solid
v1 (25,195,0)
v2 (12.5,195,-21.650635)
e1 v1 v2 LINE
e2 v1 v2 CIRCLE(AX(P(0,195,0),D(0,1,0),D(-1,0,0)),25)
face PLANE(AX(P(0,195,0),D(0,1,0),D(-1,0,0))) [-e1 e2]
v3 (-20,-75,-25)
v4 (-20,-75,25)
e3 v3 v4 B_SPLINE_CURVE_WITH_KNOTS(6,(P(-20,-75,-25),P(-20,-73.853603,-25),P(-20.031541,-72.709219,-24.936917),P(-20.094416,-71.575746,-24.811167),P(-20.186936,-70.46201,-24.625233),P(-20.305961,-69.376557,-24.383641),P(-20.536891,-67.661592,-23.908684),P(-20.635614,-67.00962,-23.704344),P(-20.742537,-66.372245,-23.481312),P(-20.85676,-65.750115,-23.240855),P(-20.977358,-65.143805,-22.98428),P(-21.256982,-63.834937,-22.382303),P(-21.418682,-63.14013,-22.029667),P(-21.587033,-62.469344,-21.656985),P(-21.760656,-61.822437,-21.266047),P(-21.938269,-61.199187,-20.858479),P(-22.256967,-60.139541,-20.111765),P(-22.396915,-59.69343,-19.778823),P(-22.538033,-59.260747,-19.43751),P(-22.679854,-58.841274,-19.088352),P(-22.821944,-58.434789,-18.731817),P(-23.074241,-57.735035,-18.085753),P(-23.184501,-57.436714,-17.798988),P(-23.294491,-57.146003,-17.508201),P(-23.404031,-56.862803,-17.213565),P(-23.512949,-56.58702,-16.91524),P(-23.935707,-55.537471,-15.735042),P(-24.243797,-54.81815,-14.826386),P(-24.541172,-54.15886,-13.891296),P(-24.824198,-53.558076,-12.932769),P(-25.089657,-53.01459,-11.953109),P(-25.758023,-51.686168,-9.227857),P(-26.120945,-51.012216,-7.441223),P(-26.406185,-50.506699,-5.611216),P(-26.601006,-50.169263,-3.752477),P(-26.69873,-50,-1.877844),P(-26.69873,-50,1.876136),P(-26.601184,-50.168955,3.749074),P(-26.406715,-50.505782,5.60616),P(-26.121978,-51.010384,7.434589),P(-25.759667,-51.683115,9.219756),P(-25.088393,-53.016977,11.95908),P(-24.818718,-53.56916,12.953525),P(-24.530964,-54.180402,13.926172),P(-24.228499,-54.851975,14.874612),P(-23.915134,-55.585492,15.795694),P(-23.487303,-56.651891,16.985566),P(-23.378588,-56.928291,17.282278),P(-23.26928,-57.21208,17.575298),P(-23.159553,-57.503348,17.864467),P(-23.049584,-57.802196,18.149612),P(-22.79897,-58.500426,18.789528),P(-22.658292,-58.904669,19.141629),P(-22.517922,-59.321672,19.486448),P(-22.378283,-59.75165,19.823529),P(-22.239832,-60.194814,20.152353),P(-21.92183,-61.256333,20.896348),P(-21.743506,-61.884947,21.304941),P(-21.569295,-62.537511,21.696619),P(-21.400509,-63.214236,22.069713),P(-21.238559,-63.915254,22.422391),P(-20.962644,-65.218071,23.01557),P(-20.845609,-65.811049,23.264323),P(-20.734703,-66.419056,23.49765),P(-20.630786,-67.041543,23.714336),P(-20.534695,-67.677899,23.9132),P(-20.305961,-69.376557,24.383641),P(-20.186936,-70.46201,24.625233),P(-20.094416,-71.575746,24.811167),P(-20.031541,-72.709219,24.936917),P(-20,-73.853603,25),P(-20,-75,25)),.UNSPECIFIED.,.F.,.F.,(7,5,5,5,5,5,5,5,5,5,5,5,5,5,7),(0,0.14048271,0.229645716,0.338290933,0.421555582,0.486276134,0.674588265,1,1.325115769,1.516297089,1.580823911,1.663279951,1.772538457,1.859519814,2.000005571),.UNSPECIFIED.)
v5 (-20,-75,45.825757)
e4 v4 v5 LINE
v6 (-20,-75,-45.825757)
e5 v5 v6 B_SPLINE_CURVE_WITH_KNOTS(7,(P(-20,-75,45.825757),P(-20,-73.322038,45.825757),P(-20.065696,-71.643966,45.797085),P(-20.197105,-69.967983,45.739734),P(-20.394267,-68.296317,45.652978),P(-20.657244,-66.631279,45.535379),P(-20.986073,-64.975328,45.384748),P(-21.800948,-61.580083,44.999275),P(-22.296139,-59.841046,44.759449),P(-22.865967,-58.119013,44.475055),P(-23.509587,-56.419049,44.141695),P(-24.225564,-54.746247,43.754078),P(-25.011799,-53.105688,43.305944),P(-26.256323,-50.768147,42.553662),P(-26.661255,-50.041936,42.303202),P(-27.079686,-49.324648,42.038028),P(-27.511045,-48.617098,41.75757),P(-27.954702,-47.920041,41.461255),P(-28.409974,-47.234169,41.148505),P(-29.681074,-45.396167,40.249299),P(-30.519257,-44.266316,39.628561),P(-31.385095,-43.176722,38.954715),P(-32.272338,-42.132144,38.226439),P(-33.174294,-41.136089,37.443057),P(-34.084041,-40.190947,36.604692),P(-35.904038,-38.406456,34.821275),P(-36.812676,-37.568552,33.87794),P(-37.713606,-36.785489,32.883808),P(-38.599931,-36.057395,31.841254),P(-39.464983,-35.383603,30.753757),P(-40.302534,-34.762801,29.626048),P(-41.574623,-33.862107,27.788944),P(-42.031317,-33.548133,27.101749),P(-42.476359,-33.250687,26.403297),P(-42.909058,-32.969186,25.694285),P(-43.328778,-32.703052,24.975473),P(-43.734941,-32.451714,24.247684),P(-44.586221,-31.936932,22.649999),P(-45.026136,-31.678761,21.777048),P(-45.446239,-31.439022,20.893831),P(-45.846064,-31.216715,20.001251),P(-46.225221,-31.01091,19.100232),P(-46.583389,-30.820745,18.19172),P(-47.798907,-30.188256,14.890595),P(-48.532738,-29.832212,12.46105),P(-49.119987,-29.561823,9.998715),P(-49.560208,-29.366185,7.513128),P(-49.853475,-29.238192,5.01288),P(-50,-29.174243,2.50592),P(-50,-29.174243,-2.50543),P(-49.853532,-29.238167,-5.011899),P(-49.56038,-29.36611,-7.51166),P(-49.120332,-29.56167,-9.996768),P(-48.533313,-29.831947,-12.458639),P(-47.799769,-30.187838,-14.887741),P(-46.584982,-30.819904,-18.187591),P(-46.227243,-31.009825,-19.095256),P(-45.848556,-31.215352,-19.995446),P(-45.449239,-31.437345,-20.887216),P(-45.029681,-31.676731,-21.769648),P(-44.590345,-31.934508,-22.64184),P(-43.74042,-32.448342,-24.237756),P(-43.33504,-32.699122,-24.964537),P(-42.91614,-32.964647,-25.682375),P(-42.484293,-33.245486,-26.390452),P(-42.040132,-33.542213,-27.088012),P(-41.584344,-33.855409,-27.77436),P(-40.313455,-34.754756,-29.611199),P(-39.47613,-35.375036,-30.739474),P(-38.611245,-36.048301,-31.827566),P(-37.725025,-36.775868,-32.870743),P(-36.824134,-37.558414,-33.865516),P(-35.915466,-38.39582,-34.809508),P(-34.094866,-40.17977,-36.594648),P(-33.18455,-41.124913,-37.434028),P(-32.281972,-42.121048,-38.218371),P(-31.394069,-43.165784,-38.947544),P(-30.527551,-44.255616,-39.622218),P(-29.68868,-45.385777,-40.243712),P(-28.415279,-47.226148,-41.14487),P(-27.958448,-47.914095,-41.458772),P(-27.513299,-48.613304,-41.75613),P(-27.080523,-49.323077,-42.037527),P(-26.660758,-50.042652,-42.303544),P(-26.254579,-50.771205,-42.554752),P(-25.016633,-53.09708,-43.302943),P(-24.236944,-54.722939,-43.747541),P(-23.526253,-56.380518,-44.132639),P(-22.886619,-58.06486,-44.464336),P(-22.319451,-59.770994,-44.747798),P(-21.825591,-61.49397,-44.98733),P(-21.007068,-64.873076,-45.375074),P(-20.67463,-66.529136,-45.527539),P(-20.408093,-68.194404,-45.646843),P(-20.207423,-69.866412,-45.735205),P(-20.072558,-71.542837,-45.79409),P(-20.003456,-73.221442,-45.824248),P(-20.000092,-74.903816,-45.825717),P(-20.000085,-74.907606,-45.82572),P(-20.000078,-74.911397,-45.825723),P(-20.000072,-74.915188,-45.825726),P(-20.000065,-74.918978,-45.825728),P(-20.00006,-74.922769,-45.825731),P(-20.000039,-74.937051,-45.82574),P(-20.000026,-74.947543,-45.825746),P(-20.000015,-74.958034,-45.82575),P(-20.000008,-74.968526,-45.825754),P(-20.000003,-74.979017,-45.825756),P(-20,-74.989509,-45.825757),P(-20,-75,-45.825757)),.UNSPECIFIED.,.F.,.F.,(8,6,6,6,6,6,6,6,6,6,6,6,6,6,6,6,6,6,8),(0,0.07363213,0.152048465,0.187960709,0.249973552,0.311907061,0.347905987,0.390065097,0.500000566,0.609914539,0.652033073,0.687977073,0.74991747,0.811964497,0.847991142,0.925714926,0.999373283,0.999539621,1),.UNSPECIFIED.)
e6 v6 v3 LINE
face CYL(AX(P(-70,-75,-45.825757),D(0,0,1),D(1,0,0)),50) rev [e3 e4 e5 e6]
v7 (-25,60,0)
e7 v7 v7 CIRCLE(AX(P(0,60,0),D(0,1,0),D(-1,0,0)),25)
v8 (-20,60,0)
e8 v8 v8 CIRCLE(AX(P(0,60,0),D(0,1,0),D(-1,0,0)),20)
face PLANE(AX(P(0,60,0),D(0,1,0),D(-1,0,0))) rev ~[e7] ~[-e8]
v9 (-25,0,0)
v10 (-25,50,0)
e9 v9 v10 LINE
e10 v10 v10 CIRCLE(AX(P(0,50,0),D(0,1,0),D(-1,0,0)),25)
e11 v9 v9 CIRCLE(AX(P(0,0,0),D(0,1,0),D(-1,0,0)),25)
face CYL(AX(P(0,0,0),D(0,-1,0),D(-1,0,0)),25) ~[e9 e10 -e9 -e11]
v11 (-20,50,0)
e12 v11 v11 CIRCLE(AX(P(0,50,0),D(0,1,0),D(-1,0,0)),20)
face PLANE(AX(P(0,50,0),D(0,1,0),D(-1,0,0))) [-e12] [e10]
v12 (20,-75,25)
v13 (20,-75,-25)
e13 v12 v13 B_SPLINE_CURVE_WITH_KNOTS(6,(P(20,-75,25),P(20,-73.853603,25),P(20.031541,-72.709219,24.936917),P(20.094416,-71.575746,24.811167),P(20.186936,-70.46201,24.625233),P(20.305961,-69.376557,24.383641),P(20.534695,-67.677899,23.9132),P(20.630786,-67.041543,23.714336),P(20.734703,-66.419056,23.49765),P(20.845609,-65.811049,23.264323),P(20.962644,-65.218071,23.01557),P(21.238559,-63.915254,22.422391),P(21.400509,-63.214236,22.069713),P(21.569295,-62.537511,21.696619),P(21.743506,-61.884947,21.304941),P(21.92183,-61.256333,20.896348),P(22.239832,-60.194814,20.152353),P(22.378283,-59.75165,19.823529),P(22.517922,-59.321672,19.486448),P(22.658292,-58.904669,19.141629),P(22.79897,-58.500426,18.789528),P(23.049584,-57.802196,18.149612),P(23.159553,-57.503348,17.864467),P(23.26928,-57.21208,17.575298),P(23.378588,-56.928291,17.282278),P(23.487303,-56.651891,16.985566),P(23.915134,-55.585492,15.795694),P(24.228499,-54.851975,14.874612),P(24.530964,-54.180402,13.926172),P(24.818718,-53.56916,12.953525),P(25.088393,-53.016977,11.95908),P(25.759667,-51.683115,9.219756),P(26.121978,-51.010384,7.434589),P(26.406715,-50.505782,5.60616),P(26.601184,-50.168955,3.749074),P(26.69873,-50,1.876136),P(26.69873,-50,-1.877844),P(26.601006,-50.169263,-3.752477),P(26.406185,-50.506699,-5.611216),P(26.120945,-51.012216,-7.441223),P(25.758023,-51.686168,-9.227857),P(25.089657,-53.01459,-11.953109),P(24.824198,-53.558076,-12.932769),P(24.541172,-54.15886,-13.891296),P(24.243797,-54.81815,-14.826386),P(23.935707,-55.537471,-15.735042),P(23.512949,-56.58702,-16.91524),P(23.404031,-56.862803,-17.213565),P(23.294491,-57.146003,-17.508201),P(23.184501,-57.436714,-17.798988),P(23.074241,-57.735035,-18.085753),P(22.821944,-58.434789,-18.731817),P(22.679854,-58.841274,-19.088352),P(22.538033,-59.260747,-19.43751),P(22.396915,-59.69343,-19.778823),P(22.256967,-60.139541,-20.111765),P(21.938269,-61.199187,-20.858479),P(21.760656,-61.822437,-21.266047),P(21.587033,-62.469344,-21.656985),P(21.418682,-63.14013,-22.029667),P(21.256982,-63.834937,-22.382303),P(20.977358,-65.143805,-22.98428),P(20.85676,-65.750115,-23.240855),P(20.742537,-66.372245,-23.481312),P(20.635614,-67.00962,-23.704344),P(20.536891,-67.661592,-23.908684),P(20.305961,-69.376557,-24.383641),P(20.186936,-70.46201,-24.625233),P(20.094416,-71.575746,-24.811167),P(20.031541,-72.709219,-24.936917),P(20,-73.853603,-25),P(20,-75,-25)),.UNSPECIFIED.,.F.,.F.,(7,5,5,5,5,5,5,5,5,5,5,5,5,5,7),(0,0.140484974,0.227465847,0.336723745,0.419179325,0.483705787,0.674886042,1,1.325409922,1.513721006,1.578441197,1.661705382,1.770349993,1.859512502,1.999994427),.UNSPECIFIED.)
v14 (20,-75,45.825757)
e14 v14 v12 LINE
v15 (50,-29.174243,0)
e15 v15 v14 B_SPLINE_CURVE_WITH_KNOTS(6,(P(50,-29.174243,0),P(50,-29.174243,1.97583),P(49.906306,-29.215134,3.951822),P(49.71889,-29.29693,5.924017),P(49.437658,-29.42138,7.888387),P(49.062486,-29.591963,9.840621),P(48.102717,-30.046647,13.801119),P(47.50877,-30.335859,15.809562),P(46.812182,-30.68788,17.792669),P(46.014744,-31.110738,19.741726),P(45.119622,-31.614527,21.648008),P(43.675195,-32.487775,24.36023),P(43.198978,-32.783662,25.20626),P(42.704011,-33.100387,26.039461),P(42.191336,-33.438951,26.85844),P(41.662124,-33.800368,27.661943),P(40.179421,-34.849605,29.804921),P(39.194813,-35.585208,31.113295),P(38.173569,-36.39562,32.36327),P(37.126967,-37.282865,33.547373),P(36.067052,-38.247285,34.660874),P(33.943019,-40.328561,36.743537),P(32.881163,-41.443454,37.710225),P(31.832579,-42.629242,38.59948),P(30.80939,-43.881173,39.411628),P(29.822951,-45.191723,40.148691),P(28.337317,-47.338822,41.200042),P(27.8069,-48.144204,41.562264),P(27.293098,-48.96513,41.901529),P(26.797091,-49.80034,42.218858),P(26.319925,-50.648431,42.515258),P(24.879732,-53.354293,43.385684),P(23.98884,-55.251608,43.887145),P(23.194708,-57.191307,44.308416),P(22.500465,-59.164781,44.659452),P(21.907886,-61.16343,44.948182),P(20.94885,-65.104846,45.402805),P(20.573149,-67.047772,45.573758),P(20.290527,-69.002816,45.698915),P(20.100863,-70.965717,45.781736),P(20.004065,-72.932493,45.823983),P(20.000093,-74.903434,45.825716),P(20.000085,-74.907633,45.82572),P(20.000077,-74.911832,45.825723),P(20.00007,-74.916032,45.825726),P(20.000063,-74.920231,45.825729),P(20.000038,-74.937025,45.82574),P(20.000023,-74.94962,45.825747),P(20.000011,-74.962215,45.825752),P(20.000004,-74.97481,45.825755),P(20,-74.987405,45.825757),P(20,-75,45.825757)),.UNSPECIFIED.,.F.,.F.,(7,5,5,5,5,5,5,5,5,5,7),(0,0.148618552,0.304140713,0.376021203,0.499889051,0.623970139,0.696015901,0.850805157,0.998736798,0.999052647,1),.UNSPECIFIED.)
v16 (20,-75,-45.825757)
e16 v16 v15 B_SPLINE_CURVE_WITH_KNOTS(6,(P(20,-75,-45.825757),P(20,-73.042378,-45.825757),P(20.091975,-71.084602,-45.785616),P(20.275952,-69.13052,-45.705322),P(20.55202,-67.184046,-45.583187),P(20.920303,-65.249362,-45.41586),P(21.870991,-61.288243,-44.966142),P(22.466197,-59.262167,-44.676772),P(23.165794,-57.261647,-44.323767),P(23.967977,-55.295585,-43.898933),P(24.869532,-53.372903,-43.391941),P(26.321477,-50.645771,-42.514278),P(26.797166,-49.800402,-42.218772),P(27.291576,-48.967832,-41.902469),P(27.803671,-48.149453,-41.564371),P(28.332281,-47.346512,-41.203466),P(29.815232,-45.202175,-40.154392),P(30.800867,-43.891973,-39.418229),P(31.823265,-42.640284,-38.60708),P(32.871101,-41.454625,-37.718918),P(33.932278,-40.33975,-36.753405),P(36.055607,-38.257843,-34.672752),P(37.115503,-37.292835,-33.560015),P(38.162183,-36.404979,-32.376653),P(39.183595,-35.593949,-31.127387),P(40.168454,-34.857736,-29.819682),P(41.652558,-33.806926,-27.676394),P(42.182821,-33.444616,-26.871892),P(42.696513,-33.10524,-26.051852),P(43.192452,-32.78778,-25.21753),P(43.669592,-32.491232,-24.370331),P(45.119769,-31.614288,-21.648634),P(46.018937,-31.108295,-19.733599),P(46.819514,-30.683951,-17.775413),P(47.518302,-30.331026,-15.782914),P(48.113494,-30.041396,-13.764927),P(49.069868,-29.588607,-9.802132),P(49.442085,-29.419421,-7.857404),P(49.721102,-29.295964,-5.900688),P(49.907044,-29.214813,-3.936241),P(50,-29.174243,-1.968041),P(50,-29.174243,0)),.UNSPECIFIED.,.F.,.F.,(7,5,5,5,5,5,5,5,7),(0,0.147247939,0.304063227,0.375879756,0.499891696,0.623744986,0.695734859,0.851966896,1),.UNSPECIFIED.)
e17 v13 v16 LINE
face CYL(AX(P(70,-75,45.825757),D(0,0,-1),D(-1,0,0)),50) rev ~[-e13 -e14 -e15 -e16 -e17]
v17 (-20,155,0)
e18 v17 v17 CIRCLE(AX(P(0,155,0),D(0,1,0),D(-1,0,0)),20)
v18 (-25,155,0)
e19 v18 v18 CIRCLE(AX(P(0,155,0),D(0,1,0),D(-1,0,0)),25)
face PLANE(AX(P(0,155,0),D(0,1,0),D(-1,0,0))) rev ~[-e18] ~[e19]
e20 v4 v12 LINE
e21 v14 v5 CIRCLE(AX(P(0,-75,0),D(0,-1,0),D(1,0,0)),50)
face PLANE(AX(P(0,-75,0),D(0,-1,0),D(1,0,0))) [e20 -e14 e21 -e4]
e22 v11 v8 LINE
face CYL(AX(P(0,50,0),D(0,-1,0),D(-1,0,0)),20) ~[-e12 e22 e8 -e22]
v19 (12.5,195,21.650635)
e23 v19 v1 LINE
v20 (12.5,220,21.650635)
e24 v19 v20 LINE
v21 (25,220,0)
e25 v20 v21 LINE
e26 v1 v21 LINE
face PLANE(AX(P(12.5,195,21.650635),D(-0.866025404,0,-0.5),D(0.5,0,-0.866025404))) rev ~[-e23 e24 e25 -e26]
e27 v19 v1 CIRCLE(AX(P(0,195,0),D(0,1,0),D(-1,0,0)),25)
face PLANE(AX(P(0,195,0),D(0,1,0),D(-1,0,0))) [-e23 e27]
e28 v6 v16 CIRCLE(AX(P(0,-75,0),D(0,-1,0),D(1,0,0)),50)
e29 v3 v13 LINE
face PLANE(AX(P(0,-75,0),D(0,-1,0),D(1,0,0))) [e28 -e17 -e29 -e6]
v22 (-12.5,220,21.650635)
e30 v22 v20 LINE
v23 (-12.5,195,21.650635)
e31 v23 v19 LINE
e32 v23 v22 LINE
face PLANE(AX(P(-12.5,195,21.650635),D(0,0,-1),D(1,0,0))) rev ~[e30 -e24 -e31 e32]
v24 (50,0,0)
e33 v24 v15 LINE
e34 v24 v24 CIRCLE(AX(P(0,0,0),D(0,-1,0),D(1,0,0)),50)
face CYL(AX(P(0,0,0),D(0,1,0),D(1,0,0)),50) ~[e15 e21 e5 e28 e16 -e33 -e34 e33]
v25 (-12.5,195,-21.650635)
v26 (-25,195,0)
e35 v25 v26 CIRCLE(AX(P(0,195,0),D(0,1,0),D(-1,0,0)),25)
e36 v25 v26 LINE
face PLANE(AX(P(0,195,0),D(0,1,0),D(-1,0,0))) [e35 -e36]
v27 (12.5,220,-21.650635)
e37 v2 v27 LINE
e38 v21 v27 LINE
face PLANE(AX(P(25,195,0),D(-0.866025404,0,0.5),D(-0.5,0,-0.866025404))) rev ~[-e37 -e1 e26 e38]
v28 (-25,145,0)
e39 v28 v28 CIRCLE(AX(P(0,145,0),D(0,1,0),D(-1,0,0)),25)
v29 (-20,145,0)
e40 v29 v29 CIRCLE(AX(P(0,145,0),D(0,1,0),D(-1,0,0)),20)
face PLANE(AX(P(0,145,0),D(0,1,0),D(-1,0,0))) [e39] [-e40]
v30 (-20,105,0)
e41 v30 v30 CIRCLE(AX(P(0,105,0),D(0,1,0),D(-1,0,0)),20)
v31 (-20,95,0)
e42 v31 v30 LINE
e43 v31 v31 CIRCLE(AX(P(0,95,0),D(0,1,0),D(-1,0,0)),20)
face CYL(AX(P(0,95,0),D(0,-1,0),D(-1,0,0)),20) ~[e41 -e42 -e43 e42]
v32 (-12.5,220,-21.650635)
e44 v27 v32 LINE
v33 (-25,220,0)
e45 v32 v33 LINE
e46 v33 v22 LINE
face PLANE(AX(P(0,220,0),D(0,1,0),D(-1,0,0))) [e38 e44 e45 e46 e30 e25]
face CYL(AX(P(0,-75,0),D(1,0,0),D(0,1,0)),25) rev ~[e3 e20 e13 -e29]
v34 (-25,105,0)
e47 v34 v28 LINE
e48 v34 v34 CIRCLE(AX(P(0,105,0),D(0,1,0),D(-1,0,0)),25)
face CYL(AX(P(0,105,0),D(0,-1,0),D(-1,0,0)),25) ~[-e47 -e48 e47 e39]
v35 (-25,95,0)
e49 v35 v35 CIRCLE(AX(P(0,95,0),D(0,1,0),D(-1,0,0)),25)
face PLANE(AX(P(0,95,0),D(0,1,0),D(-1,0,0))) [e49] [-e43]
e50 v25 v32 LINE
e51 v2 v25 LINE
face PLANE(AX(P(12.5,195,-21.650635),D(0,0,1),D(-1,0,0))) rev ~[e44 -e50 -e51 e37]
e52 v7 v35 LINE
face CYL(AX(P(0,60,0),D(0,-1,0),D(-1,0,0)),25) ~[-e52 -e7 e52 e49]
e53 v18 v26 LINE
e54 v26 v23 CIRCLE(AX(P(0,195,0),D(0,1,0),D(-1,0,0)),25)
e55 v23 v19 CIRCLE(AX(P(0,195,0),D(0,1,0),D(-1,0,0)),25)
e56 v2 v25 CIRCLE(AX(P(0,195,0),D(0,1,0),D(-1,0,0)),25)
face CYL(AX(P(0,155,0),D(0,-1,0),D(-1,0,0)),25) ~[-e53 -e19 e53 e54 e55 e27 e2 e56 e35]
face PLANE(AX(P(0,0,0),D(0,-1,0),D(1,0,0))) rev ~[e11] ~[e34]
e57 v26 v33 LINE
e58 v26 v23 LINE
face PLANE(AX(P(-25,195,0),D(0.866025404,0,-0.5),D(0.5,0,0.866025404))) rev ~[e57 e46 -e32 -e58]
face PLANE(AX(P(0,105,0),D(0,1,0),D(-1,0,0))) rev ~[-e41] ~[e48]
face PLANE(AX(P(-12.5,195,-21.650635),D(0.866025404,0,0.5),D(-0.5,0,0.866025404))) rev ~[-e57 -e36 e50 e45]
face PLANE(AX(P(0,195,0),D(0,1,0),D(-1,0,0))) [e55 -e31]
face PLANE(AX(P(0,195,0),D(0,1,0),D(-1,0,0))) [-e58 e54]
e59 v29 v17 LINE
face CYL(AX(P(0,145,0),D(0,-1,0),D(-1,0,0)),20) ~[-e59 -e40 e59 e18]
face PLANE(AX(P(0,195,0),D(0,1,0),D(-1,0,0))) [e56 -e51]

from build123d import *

# Parameters (mm, degrees)
F0_R      = 50
F1_DEPTH  = 75
F2_R      = 25
F3_DEPTH  = 50
F4_R      = 20
F5_DEPTH  = 10
F6_R      = 25
F7_DEPTH  = 35
F8_R      = 20
F9_DEPTH  = 10
F10_R     = 25
F11_DEPTH = 40
F12_R     = 20
F13_DEPTH = 10
F14_R     = 25
F15_DEPTH = 40
F17_DEPTH = 25
F19_ANGLE = 90
F22_R     = 25
F23_DEPTH = 50


# Not quite as in the source:
# - a feature names something its author has since deleted; it is built from what else it names


with BuildPart() as f1:
    # F0 (on Front) → F1 (new body)
    with BuildSketch(Plane.XZ):
        Circle(F0_R)
    extrude(amount=F1_DEPTH)

    # F2 (on face) → F3 (join)
    with BuildSketch(Plane(origin=(0, 0, 0), x_dir=(-1, 0, 0), z_dir=(0, 1, 0))):
        Circle(F2_R)
    extrude(amount=F3_DEPTH)

    # F4 (on face) → F5 (join)
    with BuildSketch(Plane(origin=(0, 50, 0), x_dir=(-1, 0, 0), z_dir=(0, 1, 0))):
        Circle(F4_R)
    extrude(amount=F5_DEPTH)

    # F6 (on face) → F7 (join)
    with BuildSketch(Plane(origin=(0, 60, 0), x_dir=(-1, 0, 0), z_dir=(0, 1, 0))):
        Circle(F6_R)
    extrude(amount=F7_DEPTH)

    # F8 (on face) → F9 (join)
    with BuildSketch(Plane(origin=(0, 95, 0), x_dir=(-1, 0, 0), z_dir=(0, 1, 0))):
        Circle(F8_R)
    extrude(amount=F9_DEPTH)

    # F10 (on face) → F11 (join)
    with BuildSketch(Plane(origin=(0, 105, 0), x_dir=(-1, 0, 0), z_dir=(0, 1, 0))):
        Circle(F10_R)
    extrude(amount=F11_DEPTH)

    # F12 (on face) → F13 (join)
    with BuildSketch(Plane(origin=(0, 145, 0), x_dir=(-1, 0, 0), z_dir=(0, 1, 0))):
        Circle(F12_R)
    extrude(amount=F13_DEPTH)

    # F14 (on face) → F15 (join)
    with BuildSketch(Plane(origin=(0, 155, 0), x_dir=(-1, 0, 0), z_dir=(0, 1, 0))):
        Circle(F14_R)
    extrude(amount=F15_DEPTH)

    # F16 (on face) → F17 (join)
    with BuildSketch(Plane(origin=(0, 195, 0), x_dir=(-1, 0, 0), z_dir=(0, 1, 0))):
        Polygon((12.5, 21.6506350946), (-12.5, 21.6506350946), (-25, 0), (-12.5, -21.6506350946), (12.5, -21.6506350946), (25, 0), align=None)
    extrude(amount=F17_DEPTH)

    # F18 (on face) → F19 (revolve, cut)
    with BuildSketch(Plane.XZ.offset(75)):
        with BuildLine():
            ThreePointArc((50, 0), (41.8330013267, 27.3861278753), (20, 45.8257569496))
            Line((20, 45.8257569496), (20, -45.8257569496))
            ThreePointArc((20, -45.8257569496), (41.8330013267, -27.3861278753), (50, 0))
        make_face()
    revolve(axis=Axis((70, -75, -0.5619522762), (0, 0, -1)), revolution_arc=F19_ANGLE, mode=Mode.SUBTRACT)

    # F20 (on face) → F21 (revolve, cut)
    with BuildSketch(Plane.XZ.offset(75)):
        with BuildLine():
            Line((-20, -45.8257569496), (-20, 45.8257569496))
            ThreePointArc((-20, 45.8257569496), (-50, 0), (-20, -45.8257569496))
        make_face()
    revolve(axis=Axis((-70, -75, -0.6762938916), (0, 0, -1)), mode=Mode.SUBTRACT)

    # F22 (on Right) → F23 (cut, symmetric)
    with BuildSketch(Plane.YZ):
        with Locations((-75, 0)):
            Circle(F22_R)
    extrude(amount=F23_DEPTH, both=True, mode=Mode.SUBTRACT)


solid = f1.part
